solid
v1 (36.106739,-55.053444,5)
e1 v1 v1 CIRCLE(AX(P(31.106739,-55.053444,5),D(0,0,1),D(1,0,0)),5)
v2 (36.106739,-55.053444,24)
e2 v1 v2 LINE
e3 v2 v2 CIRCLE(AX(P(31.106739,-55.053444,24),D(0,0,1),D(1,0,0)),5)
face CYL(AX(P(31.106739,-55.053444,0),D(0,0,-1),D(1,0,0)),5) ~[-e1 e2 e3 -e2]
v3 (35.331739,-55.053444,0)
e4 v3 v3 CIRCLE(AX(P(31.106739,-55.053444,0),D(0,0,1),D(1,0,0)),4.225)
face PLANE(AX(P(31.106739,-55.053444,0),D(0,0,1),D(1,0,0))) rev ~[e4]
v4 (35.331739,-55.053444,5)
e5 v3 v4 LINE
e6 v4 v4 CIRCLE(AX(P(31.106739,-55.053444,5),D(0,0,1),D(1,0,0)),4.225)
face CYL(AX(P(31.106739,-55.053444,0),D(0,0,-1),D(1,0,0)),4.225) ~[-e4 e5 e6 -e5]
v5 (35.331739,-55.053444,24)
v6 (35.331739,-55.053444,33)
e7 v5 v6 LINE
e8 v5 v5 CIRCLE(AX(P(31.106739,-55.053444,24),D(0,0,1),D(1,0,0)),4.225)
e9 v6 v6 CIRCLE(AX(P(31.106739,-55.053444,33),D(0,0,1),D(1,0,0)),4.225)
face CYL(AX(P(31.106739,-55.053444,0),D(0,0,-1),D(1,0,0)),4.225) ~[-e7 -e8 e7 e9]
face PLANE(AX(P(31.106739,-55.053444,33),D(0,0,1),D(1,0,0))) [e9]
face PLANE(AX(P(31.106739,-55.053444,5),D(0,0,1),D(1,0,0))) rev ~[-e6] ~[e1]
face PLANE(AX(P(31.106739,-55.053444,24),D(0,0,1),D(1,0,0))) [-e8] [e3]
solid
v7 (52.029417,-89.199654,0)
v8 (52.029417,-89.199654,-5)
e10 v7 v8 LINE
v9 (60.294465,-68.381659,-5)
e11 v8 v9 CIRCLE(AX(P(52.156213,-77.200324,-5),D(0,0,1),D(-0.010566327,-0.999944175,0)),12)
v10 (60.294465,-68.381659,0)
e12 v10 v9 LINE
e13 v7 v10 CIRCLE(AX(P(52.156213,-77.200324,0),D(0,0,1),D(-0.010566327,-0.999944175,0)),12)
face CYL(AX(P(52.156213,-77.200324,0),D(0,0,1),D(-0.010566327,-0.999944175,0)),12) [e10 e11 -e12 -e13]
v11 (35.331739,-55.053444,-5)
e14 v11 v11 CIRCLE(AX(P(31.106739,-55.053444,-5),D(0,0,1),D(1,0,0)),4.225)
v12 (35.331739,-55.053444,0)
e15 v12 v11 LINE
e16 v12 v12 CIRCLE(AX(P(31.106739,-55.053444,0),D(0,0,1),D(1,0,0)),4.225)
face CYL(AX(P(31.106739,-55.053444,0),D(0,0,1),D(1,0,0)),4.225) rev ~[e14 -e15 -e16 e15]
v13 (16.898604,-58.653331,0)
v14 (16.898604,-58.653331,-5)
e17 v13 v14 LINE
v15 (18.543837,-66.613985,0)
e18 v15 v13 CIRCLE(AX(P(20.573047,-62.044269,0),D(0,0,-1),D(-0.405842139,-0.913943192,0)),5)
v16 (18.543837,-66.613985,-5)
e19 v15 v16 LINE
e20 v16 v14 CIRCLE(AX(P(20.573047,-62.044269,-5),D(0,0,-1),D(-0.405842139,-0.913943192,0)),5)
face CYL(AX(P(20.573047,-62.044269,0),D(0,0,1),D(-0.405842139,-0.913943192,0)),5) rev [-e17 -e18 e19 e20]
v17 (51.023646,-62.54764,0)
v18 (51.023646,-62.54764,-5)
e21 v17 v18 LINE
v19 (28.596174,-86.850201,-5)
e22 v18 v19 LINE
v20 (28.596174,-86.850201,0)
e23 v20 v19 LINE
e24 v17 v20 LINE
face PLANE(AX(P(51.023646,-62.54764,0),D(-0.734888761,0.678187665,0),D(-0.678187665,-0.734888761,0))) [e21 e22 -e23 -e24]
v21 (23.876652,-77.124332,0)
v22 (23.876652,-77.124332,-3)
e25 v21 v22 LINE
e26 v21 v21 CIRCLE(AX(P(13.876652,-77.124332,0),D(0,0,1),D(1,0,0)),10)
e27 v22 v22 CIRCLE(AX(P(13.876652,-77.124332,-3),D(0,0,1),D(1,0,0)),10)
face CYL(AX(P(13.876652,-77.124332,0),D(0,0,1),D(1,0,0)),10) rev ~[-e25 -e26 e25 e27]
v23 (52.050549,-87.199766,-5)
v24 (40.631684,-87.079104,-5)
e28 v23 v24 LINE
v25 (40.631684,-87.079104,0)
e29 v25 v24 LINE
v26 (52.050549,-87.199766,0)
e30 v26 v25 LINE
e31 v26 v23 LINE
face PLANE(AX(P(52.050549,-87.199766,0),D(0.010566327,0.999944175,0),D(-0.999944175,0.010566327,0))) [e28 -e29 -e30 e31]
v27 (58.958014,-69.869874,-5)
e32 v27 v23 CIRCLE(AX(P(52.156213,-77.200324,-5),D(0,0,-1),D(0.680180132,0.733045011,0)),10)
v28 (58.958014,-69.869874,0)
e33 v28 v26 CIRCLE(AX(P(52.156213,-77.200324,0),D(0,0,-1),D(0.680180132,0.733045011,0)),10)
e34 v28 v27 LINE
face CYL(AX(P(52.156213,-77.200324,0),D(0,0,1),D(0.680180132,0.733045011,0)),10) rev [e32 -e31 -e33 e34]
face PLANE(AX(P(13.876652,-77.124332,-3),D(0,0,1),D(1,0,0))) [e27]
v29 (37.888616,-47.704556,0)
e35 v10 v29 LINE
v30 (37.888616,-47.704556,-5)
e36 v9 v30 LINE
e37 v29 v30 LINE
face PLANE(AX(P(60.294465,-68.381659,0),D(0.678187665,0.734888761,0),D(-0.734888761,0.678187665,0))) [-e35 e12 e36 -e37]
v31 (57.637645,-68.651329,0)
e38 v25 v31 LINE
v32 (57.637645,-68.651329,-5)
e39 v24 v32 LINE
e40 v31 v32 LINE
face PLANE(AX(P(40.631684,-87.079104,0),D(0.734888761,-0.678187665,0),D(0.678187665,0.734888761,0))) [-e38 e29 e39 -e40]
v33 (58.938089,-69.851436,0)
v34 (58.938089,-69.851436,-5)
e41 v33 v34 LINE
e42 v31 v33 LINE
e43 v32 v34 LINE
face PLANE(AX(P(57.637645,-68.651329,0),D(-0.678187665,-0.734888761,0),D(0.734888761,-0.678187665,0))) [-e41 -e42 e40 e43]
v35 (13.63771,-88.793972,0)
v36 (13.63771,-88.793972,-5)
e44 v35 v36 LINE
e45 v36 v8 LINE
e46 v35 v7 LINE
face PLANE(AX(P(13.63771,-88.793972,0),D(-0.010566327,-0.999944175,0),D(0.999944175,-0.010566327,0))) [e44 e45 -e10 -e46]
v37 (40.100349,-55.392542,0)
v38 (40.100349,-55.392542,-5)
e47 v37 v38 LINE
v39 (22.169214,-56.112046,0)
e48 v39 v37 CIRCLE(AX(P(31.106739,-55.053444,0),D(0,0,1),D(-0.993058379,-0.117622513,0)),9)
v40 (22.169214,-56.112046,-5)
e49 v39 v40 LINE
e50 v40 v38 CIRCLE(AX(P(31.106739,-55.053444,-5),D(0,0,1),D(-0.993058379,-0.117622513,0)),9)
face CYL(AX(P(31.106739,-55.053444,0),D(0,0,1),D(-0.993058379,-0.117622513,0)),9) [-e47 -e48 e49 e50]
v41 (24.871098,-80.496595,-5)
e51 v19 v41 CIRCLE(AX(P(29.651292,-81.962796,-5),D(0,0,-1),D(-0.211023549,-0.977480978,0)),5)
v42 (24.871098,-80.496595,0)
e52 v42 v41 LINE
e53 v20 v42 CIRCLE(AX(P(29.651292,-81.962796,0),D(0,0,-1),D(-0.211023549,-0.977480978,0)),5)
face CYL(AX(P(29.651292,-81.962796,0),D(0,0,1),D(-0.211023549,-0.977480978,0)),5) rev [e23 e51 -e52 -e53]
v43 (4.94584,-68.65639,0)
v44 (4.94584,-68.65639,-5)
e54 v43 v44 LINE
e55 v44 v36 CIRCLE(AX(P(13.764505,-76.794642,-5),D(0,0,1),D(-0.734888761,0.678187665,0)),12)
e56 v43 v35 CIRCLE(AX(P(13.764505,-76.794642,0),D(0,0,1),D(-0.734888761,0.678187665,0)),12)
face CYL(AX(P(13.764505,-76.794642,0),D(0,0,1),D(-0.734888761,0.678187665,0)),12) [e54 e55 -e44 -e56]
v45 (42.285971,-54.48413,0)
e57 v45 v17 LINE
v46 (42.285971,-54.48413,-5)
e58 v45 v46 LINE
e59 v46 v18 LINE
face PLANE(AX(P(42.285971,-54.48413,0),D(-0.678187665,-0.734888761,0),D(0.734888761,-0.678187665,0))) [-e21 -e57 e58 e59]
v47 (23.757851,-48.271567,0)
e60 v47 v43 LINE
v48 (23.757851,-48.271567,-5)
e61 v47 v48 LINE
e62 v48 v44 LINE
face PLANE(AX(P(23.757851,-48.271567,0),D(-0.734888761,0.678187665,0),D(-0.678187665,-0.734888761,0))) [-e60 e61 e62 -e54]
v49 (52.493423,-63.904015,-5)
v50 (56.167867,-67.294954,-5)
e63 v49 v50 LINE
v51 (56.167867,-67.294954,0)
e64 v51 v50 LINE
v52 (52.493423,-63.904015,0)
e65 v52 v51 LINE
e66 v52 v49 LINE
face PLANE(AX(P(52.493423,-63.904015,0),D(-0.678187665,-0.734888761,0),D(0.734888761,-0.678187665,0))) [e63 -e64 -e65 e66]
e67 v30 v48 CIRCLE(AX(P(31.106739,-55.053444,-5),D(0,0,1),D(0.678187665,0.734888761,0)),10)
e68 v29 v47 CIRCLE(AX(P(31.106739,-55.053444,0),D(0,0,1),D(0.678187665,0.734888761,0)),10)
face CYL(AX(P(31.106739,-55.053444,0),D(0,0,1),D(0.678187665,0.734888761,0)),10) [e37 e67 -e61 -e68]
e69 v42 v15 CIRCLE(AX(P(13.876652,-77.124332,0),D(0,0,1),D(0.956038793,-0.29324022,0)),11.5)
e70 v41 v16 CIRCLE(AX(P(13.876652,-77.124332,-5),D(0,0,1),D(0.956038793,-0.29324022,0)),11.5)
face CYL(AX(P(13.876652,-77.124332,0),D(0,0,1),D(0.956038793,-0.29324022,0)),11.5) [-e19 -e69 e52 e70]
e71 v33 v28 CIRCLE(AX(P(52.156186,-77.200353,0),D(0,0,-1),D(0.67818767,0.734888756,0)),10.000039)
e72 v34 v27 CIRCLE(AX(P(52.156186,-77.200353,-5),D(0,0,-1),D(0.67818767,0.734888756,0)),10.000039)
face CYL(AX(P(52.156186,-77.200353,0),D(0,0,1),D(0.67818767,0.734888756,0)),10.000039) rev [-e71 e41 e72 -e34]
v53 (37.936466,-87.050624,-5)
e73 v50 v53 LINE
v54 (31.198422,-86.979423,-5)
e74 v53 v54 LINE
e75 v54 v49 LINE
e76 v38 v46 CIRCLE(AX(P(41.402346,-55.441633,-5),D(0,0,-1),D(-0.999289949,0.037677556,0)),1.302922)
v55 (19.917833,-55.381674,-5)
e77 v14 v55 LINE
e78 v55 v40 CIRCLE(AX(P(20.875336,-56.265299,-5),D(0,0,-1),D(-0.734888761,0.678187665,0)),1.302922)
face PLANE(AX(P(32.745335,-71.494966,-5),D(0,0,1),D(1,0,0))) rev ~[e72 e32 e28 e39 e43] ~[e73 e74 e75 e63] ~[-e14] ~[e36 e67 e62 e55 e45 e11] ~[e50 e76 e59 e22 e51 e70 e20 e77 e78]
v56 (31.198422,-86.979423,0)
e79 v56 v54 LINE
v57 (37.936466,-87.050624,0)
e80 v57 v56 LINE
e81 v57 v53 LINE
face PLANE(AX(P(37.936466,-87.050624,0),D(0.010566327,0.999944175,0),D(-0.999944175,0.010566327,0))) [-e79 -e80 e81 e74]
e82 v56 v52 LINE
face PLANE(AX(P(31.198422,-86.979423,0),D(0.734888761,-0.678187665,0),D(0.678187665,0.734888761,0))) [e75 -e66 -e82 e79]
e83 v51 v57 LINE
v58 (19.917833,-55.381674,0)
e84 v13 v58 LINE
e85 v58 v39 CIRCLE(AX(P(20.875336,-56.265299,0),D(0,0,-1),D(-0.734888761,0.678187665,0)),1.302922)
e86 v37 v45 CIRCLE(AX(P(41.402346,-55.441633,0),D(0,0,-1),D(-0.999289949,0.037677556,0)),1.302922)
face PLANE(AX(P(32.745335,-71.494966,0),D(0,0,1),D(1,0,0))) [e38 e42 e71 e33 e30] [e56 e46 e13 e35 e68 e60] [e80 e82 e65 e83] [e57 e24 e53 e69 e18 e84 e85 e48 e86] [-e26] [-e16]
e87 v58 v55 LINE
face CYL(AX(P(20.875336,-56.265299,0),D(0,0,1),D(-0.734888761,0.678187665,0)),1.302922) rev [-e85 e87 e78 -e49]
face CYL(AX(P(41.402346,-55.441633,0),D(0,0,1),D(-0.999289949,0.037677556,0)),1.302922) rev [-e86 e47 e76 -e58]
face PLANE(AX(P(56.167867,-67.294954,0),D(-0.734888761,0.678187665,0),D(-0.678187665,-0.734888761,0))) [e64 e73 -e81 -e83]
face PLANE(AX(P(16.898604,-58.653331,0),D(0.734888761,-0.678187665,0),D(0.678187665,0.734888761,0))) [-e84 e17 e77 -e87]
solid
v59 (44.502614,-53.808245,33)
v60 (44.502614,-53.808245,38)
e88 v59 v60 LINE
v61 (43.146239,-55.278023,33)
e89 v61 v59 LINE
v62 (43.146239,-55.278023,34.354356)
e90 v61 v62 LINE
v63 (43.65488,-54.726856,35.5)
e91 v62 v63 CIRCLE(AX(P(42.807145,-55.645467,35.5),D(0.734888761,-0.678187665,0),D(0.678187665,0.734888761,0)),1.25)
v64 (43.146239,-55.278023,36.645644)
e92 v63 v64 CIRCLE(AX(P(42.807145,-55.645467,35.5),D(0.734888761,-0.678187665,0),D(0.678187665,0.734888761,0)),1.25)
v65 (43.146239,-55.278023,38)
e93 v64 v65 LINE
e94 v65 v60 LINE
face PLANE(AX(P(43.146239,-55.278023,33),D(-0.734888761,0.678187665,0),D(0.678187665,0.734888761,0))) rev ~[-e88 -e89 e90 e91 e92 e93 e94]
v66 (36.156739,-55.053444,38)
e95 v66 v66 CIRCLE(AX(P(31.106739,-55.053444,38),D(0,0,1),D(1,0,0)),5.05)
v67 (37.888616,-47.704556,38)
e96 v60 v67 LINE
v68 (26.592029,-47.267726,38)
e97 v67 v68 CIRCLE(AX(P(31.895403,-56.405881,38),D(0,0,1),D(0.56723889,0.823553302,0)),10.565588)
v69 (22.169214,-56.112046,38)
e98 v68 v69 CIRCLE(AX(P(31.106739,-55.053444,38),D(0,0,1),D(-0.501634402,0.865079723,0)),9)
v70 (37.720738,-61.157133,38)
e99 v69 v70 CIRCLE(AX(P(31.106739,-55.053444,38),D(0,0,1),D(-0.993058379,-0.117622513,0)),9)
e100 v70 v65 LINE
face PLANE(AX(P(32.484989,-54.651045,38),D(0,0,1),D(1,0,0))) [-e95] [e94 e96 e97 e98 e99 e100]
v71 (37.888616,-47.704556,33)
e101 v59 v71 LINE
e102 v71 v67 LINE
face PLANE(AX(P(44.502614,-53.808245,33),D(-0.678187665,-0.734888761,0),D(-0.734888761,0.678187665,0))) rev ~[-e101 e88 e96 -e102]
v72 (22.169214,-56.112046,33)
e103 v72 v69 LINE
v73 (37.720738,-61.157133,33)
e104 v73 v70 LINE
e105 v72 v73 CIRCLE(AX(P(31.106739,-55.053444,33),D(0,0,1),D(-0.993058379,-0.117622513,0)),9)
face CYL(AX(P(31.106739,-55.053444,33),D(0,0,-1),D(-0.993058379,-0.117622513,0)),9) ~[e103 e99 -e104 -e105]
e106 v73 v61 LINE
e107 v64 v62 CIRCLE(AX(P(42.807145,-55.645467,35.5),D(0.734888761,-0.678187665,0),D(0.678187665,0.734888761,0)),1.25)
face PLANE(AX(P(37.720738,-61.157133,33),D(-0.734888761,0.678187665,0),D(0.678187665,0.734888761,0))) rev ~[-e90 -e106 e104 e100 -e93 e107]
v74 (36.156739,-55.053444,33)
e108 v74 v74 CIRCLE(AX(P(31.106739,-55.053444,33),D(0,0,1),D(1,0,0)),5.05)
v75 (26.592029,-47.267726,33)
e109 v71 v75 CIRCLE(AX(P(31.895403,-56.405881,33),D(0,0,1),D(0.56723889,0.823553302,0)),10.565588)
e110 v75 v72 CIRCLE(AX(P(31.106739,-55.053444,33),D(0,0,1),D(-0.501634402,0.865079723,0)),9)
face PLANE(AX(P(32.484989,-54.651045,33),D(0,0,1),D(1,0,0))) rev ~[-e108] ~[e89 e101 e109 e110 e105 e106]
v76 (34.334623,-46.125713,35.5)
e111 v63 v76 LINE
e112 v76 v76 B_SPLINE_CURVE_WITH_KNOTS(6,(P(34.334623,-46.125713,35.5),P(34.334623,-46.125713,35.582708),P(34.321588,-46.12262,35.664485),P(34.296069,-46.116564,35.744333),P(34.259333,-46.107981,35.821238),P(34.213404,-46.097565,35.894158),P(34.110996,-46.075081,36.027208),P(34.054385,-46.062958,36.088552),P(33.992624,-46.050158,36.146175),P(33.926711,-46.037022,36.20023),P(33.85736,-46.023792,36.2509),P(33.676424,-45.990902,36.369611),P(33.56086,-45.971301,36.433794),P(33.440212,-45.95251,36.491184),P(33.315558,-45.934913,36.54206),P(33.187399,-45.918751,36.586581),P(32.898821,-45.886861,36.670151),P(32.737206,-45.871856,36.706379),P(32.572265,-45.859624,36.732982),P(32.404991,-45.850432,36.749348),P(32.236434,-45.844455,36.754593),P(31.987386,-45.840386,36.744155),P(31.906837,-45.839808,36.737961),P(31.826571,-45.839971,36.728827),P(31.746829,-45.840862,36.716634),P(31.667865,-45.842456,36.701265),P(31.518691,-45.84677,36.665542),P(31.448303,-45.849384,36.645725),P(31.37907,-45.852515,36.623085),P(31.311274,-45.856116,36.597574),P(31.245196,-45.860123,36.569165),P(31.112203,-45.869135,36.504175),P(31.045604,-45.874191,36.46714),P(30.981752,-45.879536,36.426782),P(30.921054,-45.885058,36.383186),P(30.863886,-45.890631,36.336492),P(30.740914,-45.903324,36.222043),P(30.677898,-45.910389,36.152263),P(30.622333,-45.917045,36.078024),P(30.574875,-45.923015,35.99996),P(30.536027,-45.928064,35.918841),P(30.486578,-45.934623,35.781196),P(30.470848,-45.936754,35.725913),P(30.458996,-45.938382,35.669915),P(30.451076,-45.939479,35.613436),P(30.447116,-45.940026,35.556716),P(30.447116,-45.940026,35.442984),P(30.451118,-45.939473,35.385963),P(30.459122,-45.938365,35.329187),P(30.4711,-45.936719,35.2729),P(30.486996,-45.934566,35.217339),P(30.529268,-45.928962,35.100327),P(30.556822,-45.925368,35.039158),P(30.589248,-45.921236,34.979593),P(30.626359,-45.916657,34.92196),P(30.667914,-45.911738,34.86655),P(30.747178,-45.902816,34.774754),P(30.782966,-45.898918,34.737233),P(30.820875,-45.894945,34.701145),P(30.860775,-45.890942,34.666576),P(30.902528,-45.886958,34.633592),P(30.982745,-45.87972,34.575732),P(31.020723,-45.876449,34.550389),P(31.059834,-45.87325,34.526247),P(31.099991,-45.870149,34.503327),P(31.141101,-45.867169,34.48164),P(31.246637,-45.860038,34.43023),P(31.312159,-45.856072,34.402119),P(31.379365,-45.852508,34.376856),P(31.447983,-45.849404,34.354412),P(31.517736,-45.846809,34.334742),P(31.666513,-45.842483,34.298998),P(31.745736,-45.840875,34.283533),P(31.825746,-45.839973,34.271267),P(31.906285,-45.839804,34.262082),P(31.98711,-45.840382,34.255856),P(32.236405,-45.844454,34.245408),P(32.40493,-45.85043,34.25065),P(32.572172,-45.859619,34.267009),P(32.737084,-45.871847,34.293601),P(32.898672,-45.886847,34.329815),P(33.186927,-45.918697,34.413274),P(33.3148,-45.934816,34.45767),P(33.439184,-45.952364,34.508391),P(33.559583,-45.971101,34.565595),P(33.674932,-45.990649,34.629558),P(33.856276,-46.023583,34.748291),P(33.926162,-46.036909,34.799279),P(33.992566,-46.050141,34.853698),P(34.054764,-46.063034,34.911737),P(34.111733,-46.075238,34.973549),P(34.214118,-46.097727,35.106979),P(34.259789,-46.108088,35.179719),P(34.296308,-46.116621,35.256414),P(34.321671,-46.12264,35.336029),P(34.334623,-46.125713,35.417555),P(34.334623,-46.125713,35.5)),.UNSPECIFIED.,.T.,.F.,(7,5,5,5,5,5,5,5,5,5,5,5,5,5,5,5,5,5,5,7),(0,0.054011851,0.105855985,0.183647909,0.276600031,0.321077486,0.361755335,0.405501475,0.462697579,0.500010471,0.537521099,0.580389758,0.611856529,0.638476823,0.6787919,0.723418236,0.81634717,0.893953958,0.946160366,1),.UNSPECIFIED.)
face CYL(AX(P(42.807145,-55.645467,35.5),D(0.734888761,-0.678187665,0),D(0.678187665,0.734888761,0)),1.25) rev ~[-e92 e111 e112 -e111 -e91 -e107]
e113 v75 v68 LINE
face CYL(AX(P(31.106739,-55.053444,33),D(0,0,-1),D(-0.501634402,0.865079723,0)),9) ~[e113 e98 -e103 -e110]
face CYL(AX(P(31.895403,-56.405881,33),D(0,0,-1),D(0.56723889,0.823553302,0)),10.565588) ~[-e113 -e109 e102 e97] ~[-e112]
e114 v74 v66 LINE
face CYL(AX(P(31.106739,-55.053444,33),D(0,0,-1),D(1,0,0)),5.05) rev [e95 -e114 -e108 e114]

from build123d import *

# Parameters (mm, degrees)
F0_R     = 10
F0_R_2   = 5
F0_R_3   = 4.225
F1_DEPTH = 5
F2_DEPTH = 33
F3_DEPTH = 24
F4_DEPTH = 3
F5_DEPTH = 5
F6_R     = 5.05
F7_DEPTH = 5
F8_R     = 1.25
F9_DEPTH = 37.3461542928


# Not quite as in the source:
# - a feature names something its author has since deleted; it is built from what else it names


with BuildPart() as f1:
    # F0 (on Top) → F1 (new body)
    with BuildSketch(Plane.XY):
        with BuildLine():
            ThreePointArc((37.8886156331, -47.7045562268), (30.7058016888, -45.0614846038), (23.757851373, -48.271567184))
            Line((23.757851373, -48.271567184), (4.9458403192, -68.6563901516))
            ThreePointArc((4.9458403192, -68.6563901516), (2.7469798041, -81.5500736227), (13.6377095304, -88.793972231))
            Line((13.6377095304, -88.793972231), (52.0294167207, -89.1996541952))
            ThreePointArc((52.0294167207, -89.1996541952), (63.3093775894, -81.6282933397), (60.2944646217, -68.3816589671))
            Line((60.2944646217, -68.3816589671), (37.8886156331, -47.7045562268))
        make_face()
        with Locations((13.8766520367, -77.1243319886)):
            Circle(F0_R, mode=Mode.SUBTRACT)
        with BuildLine():
            ThreePointArc((19.9178327929, -55.3816736395), (21.2773906019, -55.0259616092), (22.1692135687, -56.1120464494))
            ThreePointArc((22.1692135687, -56.1120464494), (31.4675825452, -64.046207144), (40.1003485207, -55.3925418418))
            ThreePointArc((40.1003485207, -55.3925418418), (40.9022839083, -54.2384932646), (42.285971428, -54.4841298503))
            Line((42.285971428, -54.4841298503), (51.0236458615, -62.5476400554))
            Line((51.0236458615, -62.5476400554), (52.4934233832, -63.9040153856))
            Line((52.4934233832, -63.9040153856), (56.1678671876, -67.2949537114))
            Line((56.1678671876, -67.2949537114), (57.6376447093, -68.6513290416))
            Line((57.6376447093, -68.6513290416), (58.9380892914, -69.8514364888))
            ThreePointArc((58.9380892914, -69.8514364888), (58.9480578825, -69.8606484779), (58.9580139608, -69.8698739891))
            ThreePointArc((58.9580139608, -69.8698739891), (61.4454997037, -80.9029104703), (52.0505493739, -87.1997658456))
            Line((52.0505493739, -87.1997658456), (40.6316839441, -87.0791036481))
            Line((40.6316839441, -87.0791036481), (37.9364663461, -87.0506235088))
            Line((37.9364663461, -87.0506235088), (31.1984223512, -86.9794231605))
            Line((31.1984223512, -86.9794231605), (29.5984604838, -86.962516497))
            ThreePointArc((29.5984604838, -86.962516497), (29.0944782553, -86.9316947288), (28.5961743715, -86.8502005114))
            ThreePointArc((28.5961743715, -86.8502005114), (25.3379647523, -84.491670283), (24.8710981532, -80.4965945217))
            ThreePointArc((24.8710981532, -80.4965945217), (24.3410382572, -72.3549902073), (18.5438366298, -66.6139852782))
            ThreePointArc((18.5438366298, -66.6139852782), (15.67652582, -63.0562363009), (16.8986035181, -58.6533309914))
            Line((16.8986035181, -58.6533309914), (19.9178327929, -55.3816736395))
        make_face(mode=Mode.SUBTRACT)
        with Locations((31.1067389816, -55.0534438355)):
            Circle(F0_R_2, mode=Mode.SUBTRACT)
        with Locations((13.8766520367, -77.1243319886)):
            Circle(F0_R)
        with Locations((31.1067389816, -55.0534438355)):
            Circle(F0_R_2)
        with Locations((31.1067389816, -55.0534438355)):
            Circle(F0_R_3, mode=Mode.SUBTRACT)
        with BuildLine():
            Line((52.4934233832, -63.9040153856), (51.0236458615, -62.5476400554))
            Line((51.0236458615, -62.5476400554), (28.5961743715, -86.8502005114))
            ThreePointArc((28.5961743715, -86.8502005114), (29.0944782553, -86.9316947288), (29.5984604838, -86.962516497))
            Line((29.5984604838, -86.962516497), (31.1984223512, -86.9794231605))
            Line((31.1984223512, -86.9794231605), (52.4934233832, -63.9040153856))
        make_face()
        Polygon((57.6376447093, -68.6513290416), (56.1678671876, -67.2949537114), (37.9364663461, -87.0506235088), (40.6316839441, -87.0791036481), align=None)
    extrude(amount=-F1_DEPTH)



with BuildPart() as f2:
    # F0 (on Top) → F2 (new body)
    with BuildSketch(Plane.XY):
        with Locations((31.1067389816, -55.0534438355)):
            Circle(F0_R_3)
    extrude(amount=F2_DEPTH)


with BuildPart() as f1_1:
    add(f1.part)

    add(f2.part)  # F3 merges F2
    # F0 (on Top) → F3 (join)
    with BuildSketch(Plane.XY):
        with Locations((31.1067389816, -55.0534438355)):
            Circle(F0_R_2)
        with Locations((31.1067389816, -55.0534438355)):
            Circle(F0_R_3, mode=Mode.SUBTRACT)
    extrude(amount=F3_DEPTH)

    # F0 (on Top) → F4 (cut)
    with BuildSketch(Plane.XY):
        with Locations((13.8766520367, -77.1243319886)):
            Circle(F0_R)
    extrude(amount=-F4_DEPTH, mode=Mode.SUBTRACT)

    # F0 (on Top) → F5 (cut)
    with BuildSketch(Plane.XY):
        with Locations((31.1067389816, -55.0534438355)):
            Circle(F0_R_2)
        with Locations((31.1067389816, -55.0534438355)):
            Circle(F0_R_3, mode=Mode.SUBTRACT)
    extrude(amount=F5_DEPTH, mode=Mode.SUBTRACT)


with BuildPart() as f7:
    # F6 (on face) → F7 (new body)
    with BuildSketch(Plane.XY.offset(33)):
        with BuildLine():
            ThreePointArc((26.5920293669, -47.2677263287), (23.0571330032, -51.0280440303), (22.1692135687, -56.1120464494))
            ThreePointArc((22.1692135687, -56.1120464494), (28.3295249008, -63.6142312963), (37.7207378294, -61.1571328217))
            Line((37.7207378294, -61.1571328217), (43.1462391506, -55.2780227348))
            Line((43.1462391506, -55.2780227348), (44.5026144809, -53.8082452131))
            Line((44.5026144809, -53.8082452131), (37.8886156331, -47.7045562268))
            ThreePointArc((37.8886156331, -47.7045562268), (32.303661001, -45.8481837024), (26.5920293669, -47.2677263287))
        make_face()
        with Locations((31.1067389816, -55.0534438355)):
            Circle(F6_R, mode=Mode.SUBTRACT)
    extrude(amount=F7_DEPTH)

    # F8 (on face) → F9 (cut, through all)
    with BuildSketch(Plane(origin=(50.851773792, -46.9282530538, 0), x_dir=(0.6781876651, 0.7348887609, 0), z_dir=(0.7348887609, -0.6781876651, 0))):
        with Locations((-11.8619504415, 35.5)):
            Circle(F8_R)
    extrude(amount=-F9_DEPTH, mode=Mode.SUBTRACT)


solid = Compound([f1_1.part, f7.part])
